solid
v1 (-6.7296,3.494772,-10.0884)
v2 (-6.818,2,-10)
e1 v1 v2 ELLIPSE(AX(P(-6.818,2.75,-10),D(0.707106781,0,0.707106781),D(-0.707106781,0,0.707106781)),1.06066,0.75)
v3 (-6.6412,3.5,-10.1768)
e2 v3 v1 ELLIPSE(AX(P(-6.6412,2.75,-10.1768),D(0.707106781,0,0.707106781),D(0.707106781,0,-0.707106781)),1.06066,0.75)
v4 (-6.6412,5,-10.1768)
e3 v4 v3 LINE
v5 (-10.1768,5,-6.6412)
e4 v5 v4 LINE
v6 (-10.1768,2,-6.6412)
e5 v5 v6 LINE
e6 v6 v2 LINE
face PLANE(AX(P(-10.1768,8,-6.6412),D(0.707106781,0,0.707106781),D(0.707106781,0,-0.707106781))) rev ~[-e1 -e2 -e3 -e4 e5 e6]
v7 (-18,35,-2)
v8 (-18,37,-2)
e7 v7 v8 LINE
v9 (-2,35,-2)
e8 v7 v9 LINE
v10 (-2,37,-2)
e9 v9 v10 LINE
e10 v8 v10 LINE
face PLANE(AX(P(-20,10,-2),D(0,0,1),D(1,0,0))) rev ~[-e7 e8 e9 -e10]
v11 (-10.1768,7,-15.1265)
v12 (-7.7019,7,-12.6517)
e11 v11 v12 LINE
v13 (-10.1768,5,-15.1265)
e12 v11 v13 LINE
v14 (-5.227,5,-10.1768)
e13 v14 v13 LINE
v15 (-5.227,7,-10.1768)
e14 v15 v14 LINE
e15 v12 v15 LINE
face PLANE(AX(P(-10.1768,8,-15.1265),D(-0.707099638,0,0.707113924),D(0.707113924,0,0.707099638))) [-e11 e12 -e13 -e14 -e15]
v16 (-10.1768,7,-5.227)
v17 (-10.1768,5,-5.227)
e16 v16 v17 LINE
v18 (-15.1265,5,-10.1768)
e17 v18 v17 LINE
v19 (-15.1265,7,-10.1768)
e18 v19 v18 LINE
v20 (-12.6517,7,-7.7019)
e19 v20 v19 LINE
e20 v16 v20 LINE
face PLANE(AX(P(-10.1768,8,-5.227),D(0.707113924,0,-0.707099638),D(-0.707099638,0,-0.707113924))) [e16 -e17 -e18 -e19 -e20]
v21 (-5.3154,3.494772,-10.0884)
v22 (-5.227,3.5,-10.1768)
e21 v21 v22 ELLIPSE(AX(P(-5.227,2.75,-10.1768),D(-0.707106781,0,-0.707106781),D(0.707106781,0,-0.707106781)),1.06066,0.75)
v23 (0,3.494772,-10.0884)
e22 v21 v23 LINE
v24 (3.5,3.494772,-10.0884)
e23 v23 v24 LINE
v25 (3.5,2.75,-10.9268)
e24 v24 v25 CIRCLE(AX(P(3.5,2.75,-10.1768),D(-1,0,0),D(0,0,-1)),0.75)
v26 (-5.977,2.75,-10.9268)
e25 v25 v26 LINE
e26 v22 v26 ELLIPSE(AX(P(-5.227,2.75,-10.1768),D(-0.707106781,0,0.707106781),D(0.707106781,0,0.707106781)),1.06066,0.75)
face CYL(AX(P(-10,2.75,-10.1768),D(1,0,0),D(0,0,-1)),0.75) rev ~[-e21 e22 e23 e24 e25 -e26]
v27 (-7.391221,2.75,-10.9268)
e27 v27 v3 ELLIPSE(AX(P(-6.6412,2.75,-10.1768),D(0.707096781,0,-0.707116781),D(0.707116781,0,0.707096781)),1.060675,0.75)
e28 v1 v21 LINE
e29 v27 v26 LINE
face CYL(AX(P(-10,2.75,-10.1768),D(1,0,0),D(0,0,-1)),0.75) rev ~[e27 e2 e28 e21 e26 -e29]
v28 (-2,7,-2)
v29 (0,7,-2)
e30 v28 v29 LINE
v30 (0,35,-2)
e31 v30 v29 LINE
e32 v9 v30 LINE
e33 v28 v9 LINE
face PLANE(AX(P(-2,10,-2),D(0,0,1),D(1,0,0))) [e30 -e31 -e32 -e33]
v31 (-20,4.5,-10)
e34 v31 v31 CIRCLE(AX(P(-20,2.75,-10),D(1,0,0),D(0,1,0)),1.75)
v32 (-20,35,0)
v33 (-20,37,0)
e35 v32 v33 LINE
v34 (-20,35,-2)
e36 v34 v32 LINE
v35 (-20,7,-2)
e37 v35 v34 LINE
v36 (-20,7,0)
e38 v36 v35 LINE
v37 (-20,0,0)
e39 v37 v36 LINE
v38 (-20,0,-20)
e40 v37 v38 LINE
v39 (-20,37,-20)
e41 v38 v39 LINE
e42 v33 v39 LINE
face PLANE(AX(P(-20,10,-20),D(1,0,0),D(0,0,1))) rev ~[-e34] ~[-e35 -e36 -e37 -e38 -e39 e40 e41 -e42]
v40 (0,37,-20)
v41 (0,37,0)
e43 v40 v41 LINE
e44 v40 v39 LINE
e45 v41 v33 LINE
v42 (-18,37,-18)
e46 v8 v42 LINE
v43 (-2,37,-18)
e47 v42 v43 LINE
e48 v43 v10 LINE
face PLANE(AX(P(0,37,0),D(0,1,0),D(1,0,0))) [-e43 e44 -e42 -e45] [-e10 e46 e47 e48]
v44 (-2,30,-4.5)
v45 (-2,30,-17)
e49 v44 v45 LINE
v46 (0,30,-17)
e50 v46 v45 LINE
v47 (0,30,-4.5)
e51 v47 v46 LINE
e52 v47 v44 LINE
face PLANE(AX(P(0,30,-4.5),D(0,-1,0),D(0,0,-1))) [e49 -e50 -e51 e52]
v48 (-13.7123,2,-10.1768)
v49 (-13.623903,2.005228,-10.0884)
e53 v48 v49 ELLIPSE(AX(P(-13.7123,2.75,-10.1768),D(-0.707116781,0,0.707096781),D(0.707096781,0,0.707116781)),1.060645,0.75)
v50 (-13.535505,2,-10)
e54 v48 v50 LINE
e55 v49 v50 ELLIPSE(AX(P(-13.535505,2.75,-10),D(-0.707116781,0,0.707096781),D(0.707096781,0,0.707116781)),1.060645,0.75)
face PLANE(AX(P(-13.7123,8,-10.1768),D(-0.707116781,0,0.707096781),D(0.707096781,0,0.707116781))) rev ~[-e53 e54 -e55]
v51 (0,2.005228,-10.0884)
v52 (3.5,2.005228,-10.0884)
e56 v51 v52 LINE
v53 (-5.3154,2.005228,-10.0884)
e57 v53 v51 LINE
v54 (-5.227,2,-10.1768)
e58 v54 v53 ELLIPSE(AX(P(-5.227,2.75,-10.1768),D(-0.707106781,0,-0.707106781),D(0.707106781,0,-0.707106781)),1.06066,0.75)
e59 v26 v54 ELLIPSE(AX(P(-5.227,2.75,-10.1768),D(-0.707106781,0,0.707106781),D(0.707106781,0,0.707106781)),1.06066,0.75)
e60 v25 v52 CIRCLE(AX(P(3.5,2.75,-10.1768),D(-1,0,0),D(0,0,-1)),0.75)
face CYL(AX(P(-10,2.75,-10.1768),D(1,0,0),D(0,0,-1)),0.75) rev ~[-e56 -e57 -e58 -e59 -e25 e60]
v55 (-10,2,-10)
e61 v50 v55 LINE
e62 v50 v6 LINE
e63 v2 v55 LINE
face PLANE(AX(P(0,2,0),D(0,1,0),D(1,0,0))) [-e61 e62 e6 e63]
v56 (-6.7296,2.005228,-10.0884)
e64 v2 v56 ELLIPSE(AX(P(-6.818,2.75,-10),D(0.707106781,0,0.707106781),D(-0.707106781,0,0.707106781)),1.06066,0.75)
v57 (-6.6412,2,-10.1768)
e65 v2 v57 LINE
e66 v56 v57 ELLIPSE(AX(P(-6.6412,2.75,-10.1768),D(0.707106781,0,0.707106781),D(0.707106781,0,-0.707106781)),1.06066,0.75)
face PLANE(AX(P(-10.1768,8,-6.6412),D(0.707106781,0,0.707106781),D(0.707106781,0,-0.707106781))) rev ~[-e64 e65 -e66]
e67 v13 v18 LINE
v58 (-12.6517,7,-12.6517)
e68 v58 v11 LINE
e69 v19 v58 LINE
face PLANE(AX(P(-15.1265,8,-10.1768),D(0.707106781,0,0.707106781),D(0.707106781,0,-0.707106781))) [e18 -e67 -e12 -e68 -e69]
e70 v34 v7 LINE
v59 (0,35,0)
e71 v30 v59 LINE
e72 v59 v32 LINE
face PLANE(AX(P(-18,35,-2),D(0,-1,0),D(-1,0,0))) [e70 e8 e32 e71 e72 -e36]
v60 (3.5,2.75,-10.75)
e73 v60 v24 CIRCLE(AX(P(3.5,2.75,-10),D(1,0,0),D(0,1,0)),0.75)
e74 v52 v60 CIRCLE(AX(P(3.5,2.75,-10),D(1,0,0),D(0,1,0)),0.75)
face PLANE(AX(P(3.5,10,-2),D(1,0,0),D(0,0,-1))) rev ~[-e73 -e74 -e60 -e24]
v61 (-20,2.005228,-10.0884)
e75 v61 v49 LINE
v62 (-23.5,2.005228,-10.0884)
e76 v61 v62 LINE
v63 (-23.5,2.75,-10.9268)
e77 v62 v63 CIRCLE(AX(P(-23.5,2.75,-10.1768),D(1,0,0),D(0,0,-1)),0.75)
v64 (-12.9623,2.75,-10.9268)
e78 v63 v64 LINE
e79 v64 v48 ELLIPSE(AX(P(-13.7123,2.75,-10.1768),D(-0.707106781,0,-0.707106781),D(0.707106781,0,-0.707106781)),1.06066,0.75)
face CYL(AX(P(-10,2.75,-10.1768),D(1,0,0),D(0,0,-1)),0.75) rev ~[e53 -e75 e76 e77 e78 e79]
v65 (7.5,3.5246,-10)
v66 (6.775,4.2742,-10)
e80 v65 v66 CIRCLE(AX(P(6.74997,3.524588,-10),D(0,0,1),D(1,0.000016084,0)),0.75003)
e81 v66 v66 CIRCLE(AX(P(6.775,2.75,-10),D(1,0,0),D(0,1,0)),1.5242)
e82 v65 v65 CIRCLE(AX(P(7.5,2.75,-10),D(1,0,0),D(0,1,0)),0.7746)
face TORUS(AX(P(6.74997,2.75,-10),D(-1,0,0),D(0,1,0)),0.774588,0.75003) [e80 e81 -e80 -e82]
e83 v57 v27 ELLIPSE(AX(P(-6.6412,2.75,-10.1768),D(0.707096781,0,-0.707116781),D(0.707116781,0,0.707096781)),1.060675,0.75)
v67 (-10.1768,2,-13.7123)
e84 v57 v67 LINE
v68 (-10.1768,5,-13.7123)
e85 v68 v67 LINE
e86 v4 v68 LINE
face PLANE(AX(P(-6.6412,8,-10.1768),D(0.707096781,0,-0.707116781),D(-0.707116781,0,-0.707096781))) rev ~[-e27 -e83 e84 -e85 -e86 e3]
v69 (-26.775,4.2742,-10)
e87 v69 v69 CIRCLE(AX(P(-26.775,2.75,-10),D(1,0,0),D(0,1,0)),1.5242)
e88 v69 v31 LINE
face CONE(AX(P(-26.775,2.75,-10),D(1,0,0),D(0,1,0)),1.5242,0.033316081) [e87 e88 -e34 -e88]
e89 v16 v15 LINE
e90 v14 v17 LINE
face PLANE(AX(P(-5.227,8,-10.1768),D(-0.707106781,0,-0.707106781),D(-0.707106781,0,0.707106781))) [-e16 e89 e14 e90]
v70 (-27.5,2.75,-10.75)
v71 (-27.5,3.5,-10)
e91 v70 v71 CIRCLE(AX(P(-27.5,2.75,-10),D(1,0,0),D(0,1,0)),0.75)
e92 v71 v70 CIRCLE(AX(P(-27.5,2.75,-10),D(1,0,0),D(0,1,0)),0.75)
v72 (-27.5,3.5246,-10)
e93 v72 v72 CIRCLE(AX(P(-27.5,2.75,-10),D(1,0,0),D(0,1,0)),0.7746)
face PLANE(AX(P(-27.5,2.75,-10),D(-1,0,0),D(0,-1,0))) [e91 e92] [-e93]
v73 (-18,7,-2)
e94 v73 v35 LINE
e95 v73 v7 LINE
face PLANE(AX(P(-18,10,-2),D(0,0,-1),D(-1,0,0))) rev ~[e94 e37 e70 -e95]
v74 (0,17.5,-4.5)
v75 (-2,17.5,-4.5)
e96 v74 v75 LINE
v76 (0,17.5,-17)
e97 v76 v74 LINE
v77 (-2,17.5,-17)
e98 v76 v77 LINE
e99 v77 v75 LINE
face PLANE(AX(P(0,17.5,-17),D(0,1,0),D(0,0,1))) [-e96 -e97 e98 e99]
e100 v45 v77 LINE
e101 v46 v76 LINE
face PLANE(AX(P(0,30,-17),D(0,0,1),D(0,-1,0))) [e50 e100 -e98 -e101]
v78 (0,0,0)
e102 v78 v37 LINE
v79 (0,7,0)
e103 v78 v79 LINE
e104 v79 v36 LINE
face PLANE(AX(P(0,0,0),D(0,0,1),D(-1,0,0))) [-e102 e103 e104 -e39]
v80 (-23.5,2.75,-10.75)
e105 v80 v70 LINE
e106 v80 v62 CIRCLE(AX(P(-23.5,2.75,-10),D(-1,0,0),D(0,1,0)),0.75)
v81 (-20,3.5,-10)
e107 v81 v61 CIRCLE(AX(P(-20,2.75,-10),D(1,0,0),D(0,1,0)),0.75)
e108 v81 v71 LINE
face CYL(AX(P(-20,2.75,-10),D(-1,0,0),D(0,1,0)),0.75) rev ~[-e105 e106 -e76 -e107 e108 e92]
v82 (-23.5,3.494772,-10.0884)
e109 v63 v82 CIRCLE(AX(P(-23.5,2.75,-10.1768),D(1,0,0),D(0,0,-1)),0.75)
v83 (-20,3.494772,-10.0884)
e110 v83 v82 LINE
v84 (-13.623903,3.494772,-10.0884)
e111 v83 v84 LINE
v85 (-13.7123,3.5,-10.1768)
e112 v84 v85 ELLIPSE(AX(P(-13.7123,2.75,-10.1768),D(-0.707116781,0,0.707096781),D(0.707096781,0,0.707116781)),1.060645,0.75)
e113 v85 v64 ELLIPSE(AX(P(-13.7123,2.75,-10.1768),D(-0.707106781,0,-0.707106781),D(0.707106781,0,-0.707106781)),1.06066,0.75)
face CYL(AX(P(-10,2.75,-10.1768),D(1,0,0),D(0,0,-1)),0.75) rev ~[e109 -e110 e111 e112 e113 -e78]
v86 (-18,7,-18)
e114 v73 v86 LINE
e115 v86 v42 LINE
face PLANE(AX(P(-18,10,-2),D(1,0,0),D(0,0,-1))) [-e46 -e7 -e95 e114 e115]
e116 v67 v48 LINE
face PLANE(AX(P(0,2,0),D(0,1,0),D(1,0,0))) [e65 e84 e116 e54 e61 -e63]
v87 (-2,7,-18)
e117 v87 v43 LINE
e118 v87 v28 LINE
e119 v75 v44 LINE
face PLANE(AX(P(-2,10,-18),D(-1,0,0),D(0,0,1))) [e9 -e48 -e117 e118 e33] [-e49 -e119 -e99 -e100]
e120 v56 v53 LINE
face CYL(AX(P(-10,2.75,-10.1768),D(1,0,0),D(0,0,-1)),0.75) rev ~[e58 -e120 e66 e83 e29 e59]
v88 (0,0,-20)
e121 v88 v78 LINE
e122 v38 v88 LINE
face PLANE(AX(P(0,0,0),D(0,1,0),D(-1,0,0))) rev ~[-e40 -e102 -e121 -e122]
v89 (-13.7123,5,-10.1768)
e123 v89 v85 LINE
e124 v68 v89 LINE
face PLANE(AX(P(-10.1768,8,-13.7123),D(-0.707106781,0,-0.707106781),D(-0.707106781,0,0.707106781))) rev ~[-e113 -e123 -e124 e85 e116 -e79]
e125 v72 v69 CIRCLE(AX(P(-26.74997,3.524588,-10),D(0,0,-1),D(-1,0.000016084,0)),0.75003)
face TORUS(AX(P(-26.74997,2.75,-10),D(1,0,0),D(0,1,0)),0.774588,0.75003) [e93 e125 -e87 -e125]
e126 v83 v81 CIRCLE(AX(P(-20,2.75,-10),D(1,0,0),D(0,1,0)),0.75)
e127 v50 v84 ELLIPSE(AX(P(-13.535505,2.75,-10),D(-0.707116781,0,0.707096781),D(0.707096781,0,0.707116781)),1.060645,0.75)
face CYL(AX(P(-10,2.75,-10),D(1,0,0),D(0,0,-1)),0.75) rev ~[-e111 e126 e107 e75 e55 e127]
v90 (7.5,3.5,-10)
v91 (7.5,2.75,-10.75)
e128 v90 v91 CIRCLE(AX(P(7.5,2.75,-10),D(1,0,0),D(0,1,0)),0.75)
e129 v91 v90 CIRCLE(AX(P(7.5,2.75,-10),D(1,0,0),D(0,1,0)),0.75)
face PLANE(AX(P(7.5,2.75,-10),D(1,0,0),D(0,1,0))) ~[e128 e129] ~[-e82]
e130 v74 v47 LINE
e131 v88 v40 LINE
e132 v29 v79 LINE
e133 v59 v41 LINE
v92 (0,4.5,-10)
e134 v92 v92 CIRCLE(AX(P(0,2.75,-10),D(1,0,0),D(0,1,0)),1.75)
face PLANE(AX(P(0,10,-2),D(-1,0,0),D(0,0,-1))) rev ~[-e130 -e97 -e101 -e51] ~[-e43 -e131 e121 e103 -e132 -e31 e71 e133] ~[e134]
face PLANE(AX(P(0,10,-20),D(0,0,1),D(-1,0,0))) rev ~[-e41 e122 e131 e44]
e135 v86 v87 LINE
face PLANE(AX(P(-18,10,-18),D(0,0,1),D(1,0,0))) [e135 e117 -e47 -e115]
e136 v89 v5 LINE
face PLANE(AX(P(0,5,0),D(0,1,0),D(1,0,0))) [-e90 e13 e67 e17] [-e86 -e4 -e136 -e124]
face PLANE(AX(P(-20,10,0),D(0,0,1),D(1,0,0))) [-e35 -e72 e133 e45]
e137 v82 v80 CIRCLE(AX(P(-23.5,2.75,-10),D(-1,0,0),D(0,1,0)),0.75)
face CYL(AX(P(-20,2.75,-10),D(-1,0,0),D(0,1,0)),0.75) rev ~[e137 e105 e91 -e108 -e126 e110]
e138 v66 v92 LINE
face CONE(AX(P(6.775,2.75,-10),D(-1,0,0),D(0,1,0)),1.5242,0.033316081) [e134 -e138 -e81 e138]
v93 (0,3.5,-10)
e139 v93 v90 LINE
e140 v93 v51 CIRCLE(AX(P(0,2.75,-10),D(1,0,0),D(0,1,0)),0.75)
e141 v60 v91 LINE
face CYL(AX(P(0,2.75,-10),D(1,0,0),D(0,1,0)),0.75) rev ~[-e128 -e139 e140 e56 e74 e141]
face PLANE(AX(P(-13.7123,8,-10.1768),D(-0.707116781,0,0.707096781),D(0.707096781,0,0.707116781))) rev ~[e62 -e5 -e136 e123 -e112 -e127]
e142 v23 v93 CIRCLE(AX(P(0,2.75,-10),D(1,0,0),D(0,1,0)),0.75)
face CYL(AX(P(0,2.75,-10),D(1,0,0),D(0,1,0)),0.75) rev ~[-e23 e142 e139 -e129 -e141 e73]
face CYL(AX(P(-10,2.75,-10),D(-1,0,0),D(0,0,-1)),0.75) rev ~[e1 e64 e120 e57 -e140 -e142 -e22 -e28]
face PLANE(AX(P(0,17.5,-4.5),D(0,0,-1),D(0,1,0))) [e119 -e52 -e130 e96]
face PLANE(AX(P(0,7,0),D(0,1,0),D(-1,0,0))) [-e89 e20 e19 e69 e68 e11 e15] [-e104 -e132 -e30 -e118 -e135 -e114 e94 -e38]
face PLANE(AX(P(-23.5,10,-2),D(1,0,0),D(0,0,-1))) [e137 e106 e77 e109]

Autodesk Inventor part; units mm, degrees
ref_plane "YZ Plane" through (0, 0, 0) normal (1, 0, 0) x (0, 1, 0)
sketch "Sketch1" plane through (0, 0, 0) normal (0, 1, 0) x (-1, 0, 0)
  line L0 (0, 0) -> (20, 0)
  line L1 (20, 0) -> (20, -20)
  line L2 (20, -20) -> (0, -20)
  line L3 (0, -20) -> (0, 0)
  dimension "d0" = 20
  dimension "d1" = 20
extrude "Extrusion1" add sketch "Sketch1" along normal blind 10
sketch "Sketch4" plane through (0, 10, 0) normal (0, 1, 0) x (1, 0, 0)
  line L0 (0, 20) -> (-20, 20) projected
  line L1 (-20, 20) -> (-20, 0) projected
  line L2 (-20, 0) -> (0, 0) projected
  line L3 (0, 0) -> (0, 20) projected
  line L4 (0, 20) -> (-20, 20) projected
  line L5 (-20, 20) -> (0, 0)
  line L6 (-10.1768, 10.1768) -> (-7.7019, 12.6517)
  line L7 (-7.7019, 12.6517) -> (-5.227, 10.1768)
  line L8 (-5.227, 10.1768) -> (-7.7019, 7.7019)
  line L9 (-7.7019, 7.7019) -> (-10.1768, 10.1768)
  line L10 (-10.1768, 10.1768) -> (-12.6517, 7.7019)
  line L11 (-12.6517, 7.7019) -> (-15.1265, 10.1768)
  line L12 (-15.1265, 10.1768) -> (-12.6517, 12.6517)
  line L13 (-12.6517, 12.6517) -> (-10.1768, 10.1768)
  line L14 (-12.6517, 12.6517) -> (-10.1768, 15.1265)
  line L15 (-10.1768, 15.1265) -> (-7.7019, 12.6517)
  line L16 (-7.7019, 12.6517) -> (-10.1768, 10.1768)
  line L17 (-10.1768, 10.1768) -> (-12.6517, 12.6517)
  line L18 (-12.6517, 7.7019) -> (-10.1768, 10.1768)
  line L19 (-10.1768, 10.1768) -> (-7.7019, 7.7019)
  line L20 (-7.7019, 7.7019) -> (-10.1768, 5.227)
  line L21 (-10.1768, 5.227) -> (-12.6517, 7.7019)
  dimension "d10" = 3.5
  dimension "d11" = 3.5
  dimension "d12" = 3.5
  dimension "d13" = 3.5
extrude "Extrusion3" cut sketch "Sketch4" against normal blind 8 contours L14 L15 L6 L5 | L5 L10 L11 L12 | L20 L21 L10 L5 | L5 L6 L7 L8
sketch "Sketch5" plane through (0, 10, 0) normal (0, 1, 0) x (1, 0, 0)
  line L0 (-5.227, 10.1768) -> (-10.1768, 5.227) projected
  line L1 (-10.1768, 5.227) -> (-15.1265, 10.1768) projected
  line L2 (-15.1265, 10.1768) -> (-10.1768, 15.1265) projected
  line L3 (-10.1768, 15.1265) -> (-5.227, 10.1768) projected
  line L4 (0, 20) -> (-20, 20) projected
  line L5 (-20, 20) -> (-20, 0) projected
  line L6 (-20, 0) -> (0, 0) projected
  line L7 (0, 0) -> (0, 20) projected
  line L8 (-18, 18) -> (-2, 18)
  line L9 (-2, 18) -> (-2, 2)
  line L10 (-2, 2) -> (-18, 2)
  line L11 (-18, 2) -> (-18, 18)
  line L12 (-18, 2) -> (-18, 0)
  line L13 (-2, 2) -> (-2, 0)
  line L14 (-20, 0) -> (0, 0) projected
  line L15 (-18, 2) -> (-20, 2)
  line L16 (-20, 20) -> (-20, 0) projected
  line L17 (-2, 2) -> (0, 2)
  line L18 (0, 0) -> (0, 20) projected
  point P0 (0, 2)
  dimension "d16" = 2
extrude "Extrusion4" add sketch "Sketch5" along normal blind 27 contours L7 L17 L9 L8 L11 L15 L5 L4
ref_plane "Work Plane1" through (-10, 10, -2) normal (1, 0, 0) x (0, 0, -1)
sketch "Sketch6" plane through (-10, 10, -2) normal (1, 0, 0) x (0, 0, -1)
  line L0 (3.227, 0) -> (8.1768, 0) projected
  line L1 (3.227, 0) -> (3.227, -8) projected
  line L2 (3.227, -8) -> (8.1768, -8) projected
  line L3 (8.1768, 0) -> (8.1768, -8) projected
  line L4 (8.1768, 0) -> (13.1265, 0) projected
  line L5 (8.1768, 0) -> (8.1768, -8) projected
  line L6 (8.1768, -8) -> (13.1265, -8) projected
  line L7 (13.1265, 0) -> (13.1265, -8) projected
  line L8 (16, 0) -> (0, 0) projected
  line L9 (16, 0) -> (16, 27) projected
  line L10 (0, 27) -> (16, 27) projected
  line L11 (0, 0) -> (0, 27) projected
  line L12 (8.1768, 0) -> (8.1768, -8) projected
  line L13 (8.1768, -8) -> (8.1768, -7.25)
  circle A0 centre (8.1768, -7.25) radius 0.75
  point P0 (-2, -10)
  dimension "d20" = 0.75
  dimension "d21" = 1.5
extrude "Extrusion5" cut sketch "Sketch6" along normal mid plane 27 contours A0 L3 | L3 A0
ref_plane "Work Plane2" through (-20, 0, -10) normal (0, 0, 1) x (1, 0, 0)
sketch "Sketch7" plane through (-20, 0, -10) normal (0, 0, 1) x (1, 0, 0)
  line L0 (20, 0) -> (0, 0) projected
  line L1 (0, 0) -> (0, 37) projected
  line L2 (20, 37) -> (0, 37) projected
  line L3 (20, 0) -> (20, 37) projected
  arc A0 (14.773, 3.5) -> (14.773, 2) centre (14.773, 2.75) ccw projected
  arc A1 (14.773, 3.5) -> (14.773, 2) centre (14.773, 2.75) ccw projected
  line L4 (20, 3.5) -> (20, 2) projected
  line L5 (20, 3.5) -> (27.5, 3.5)
  line L6 (27.5, 3.5) -> (27.5, 2)
  line L7 (27.5, 2) -> (20, 2)
  line L8 (20, 2) -> (20, 3.5)
  line L9 (20, 3.5) -> (20, 4.5)
  line L10 (20, 0) -> (20, 37) projected
  line L11 (27.5, 3.5) -> (27.5, 3.5246)
  line L12 (26.775, 4.2742) -> (20, 4.5)
  arc A2 (27.5, 3.5246) -> (26.775, 4.2742) centre (26.75, 3.5246) ccw
  line L13 (20, 3.5) -> (20, 2) projected
  line L14 (20, 2.75) -> (27.5, 2.75)
  point P0 (27.5, 4.25)
  dimension "d25" = 7.5
  dimension "d26" = 1
  dimension "d27" = 0.75
  dimension "d28" = 0.75
revolve "Revolution1" add sketch "Sketch7" angle 360 about axis through (0, 2.75, -10) along (1, 0, 0) contours L3 L12 A2 L11 L5
mirror "Mirror1" about plane through (-10, 10, -2) normal (1, 0, 0) of "Revolution1"
sketch "Sketch8" plane through (-20, 10, -2) normal (0, 0, 1) x (1, 0, 0)
  line L0 (2, 0) -> (0, 0) projected
  line L1 (2, 0) -> (2, 27) projected
  line L2 (0, 27) -> (2, 27) projected
  line L3 (0, 0) -> (0, 27) projected
  line L4 (20, 0) -> (18, 0) projected
  line L5 (20, 0) -> (20, 27) projected
  line L6 (18, 27) -> (20, 27) projected
  line L7 (18, 0) -> (18, 27) projected
  line L8 (20, 27) -> (0, 27) projected
  line L9 (0, 27) -> (20, 27)
  line L10 (20, 27) -> (20, 25)
  line L11 (20, 25) -> (0, 25)
  line L12 (0, 25) -> (0, 27)
  point P0 (20, -10)
  point P1 (0, 25)
  dimension "d30" = 20
  dimension "d31" = 2
extrude "Extrusion6" add sketch "Sketch8" along normal blind 2 contours L11 L3 L2 L1 | L1 L8 L7 L11 | L7 L6 L5 L11
ref_plane "Work Plane3" through (0, 8, 0) normal (0, 1, 0) x (1, 0, 0)
sketch "Sketch9" plane through (0, 8, 0) normal (0, 1, 0) x (1, 0, 0)
  line L0 (-10.1768, 15.1265) -> (-5.227, 10.1768) projected
  line L1 (-15.1265, 10.1768) -> (-10.1768, 15.1265) projected
  line L2 (-10.1768, 5.227) -> (-15.1265, 10.1768) projected
  line L3 (-5.227, 10.1768) -> (-10.1768, 5.227) projected
  line L4 (-6.6412, 10.1768) -> (-10.1768, 13.7123)
  line L5 (-10.1768, 13.7123) -> (-13.7123, 10.1768)
  line L6 (-13.7123, 10.1768) -> (-10.1768, 6.6412)
  line L7 (-10.1768, 6.6412) -> (-6.6412, 10.1768)
  point P0 (0, 0)
  dimension "d35" = 1
extrude "Extrusion7" add sketch "Sketch9" against normal blind 6
extrude "Extrusion8" cut sketch "Sketch6" along normal mid plane 27 contours A0 L3 | L3 A0
sketch "Sketch10" plane through (0, 0, 0) normal (1, 0, 0) x (0, 0, -1)
  line L0 (0, 0) -> (20, 0) projected
  line L1 (20, 0) -> (20, 37) projected
  line L2 (20, 37) -> (0, 37) projected
  line L3 (0, 35) -> (0, 37) projected
  line L4 (2, 35) -> (0, 35) projected
  line L5 (2, 10) -> (2, 35) projected
  line L6 (0, 10) -> (2, 10) projected
  line L7 (0, 0) -> (0, 10) projected
  circle A0 centre (10, 2.75) radius 1.75 projected
  line L8 (2, 35) -> (10, 35)
  line L9 (10, 35) -> (4.5, 35)
  line L10 (4.5, 35) -> (4.5, 30)
  line L11 (4.5, 30) -> (17, 30)
  line L12 (17, 30) -> (17, 17.5)
  line L13 (17, 17.5) -> (4.5, 17.5)
  line L14 (4.5, 17.5) -> (4.5, 30)
  dimension "d40" = 5.5
  dimension "d41" = 5
  dimension "d42" = 12.5
  dimension "d43" = 12.5
  dimension "d44" = 8
extrude "Extrusion9" cut sketch "Sketch10" against normal blind 6 contours L11 L12 L13 L14
move faces "Move1" translate (0, -3, 0) faces at (-8.5269, 8, -13.0052)
move faces "Move3" translate (0, -3, 0) faces at (-5.8013, 10, -5.8013)
sketch "Sketch12" plane through (-10, 10, -2) normal (1, 0, 0) x (0, 0, -1)
  circle A0 centre (8, -7.25) radius 0.75 projected
  point P0 (-2, -10)
extrude "Extrusion10" cut sketch "Sketch12" along normal mid plane 100
sketch "Sketch13" plane through (0, 0, 0) normal (1, 0, 0) x (0, 0, -1)
  arc A0 (10.0884, 3.4948) -> (10, 2) centre (10, 2.75) ccw projected
  circle A1 centre (10, 2.75) radius 1.75
  point P0 (0, 0)
  dimension "d58" = 3.5
properties part number "latticeChamberv6b"
